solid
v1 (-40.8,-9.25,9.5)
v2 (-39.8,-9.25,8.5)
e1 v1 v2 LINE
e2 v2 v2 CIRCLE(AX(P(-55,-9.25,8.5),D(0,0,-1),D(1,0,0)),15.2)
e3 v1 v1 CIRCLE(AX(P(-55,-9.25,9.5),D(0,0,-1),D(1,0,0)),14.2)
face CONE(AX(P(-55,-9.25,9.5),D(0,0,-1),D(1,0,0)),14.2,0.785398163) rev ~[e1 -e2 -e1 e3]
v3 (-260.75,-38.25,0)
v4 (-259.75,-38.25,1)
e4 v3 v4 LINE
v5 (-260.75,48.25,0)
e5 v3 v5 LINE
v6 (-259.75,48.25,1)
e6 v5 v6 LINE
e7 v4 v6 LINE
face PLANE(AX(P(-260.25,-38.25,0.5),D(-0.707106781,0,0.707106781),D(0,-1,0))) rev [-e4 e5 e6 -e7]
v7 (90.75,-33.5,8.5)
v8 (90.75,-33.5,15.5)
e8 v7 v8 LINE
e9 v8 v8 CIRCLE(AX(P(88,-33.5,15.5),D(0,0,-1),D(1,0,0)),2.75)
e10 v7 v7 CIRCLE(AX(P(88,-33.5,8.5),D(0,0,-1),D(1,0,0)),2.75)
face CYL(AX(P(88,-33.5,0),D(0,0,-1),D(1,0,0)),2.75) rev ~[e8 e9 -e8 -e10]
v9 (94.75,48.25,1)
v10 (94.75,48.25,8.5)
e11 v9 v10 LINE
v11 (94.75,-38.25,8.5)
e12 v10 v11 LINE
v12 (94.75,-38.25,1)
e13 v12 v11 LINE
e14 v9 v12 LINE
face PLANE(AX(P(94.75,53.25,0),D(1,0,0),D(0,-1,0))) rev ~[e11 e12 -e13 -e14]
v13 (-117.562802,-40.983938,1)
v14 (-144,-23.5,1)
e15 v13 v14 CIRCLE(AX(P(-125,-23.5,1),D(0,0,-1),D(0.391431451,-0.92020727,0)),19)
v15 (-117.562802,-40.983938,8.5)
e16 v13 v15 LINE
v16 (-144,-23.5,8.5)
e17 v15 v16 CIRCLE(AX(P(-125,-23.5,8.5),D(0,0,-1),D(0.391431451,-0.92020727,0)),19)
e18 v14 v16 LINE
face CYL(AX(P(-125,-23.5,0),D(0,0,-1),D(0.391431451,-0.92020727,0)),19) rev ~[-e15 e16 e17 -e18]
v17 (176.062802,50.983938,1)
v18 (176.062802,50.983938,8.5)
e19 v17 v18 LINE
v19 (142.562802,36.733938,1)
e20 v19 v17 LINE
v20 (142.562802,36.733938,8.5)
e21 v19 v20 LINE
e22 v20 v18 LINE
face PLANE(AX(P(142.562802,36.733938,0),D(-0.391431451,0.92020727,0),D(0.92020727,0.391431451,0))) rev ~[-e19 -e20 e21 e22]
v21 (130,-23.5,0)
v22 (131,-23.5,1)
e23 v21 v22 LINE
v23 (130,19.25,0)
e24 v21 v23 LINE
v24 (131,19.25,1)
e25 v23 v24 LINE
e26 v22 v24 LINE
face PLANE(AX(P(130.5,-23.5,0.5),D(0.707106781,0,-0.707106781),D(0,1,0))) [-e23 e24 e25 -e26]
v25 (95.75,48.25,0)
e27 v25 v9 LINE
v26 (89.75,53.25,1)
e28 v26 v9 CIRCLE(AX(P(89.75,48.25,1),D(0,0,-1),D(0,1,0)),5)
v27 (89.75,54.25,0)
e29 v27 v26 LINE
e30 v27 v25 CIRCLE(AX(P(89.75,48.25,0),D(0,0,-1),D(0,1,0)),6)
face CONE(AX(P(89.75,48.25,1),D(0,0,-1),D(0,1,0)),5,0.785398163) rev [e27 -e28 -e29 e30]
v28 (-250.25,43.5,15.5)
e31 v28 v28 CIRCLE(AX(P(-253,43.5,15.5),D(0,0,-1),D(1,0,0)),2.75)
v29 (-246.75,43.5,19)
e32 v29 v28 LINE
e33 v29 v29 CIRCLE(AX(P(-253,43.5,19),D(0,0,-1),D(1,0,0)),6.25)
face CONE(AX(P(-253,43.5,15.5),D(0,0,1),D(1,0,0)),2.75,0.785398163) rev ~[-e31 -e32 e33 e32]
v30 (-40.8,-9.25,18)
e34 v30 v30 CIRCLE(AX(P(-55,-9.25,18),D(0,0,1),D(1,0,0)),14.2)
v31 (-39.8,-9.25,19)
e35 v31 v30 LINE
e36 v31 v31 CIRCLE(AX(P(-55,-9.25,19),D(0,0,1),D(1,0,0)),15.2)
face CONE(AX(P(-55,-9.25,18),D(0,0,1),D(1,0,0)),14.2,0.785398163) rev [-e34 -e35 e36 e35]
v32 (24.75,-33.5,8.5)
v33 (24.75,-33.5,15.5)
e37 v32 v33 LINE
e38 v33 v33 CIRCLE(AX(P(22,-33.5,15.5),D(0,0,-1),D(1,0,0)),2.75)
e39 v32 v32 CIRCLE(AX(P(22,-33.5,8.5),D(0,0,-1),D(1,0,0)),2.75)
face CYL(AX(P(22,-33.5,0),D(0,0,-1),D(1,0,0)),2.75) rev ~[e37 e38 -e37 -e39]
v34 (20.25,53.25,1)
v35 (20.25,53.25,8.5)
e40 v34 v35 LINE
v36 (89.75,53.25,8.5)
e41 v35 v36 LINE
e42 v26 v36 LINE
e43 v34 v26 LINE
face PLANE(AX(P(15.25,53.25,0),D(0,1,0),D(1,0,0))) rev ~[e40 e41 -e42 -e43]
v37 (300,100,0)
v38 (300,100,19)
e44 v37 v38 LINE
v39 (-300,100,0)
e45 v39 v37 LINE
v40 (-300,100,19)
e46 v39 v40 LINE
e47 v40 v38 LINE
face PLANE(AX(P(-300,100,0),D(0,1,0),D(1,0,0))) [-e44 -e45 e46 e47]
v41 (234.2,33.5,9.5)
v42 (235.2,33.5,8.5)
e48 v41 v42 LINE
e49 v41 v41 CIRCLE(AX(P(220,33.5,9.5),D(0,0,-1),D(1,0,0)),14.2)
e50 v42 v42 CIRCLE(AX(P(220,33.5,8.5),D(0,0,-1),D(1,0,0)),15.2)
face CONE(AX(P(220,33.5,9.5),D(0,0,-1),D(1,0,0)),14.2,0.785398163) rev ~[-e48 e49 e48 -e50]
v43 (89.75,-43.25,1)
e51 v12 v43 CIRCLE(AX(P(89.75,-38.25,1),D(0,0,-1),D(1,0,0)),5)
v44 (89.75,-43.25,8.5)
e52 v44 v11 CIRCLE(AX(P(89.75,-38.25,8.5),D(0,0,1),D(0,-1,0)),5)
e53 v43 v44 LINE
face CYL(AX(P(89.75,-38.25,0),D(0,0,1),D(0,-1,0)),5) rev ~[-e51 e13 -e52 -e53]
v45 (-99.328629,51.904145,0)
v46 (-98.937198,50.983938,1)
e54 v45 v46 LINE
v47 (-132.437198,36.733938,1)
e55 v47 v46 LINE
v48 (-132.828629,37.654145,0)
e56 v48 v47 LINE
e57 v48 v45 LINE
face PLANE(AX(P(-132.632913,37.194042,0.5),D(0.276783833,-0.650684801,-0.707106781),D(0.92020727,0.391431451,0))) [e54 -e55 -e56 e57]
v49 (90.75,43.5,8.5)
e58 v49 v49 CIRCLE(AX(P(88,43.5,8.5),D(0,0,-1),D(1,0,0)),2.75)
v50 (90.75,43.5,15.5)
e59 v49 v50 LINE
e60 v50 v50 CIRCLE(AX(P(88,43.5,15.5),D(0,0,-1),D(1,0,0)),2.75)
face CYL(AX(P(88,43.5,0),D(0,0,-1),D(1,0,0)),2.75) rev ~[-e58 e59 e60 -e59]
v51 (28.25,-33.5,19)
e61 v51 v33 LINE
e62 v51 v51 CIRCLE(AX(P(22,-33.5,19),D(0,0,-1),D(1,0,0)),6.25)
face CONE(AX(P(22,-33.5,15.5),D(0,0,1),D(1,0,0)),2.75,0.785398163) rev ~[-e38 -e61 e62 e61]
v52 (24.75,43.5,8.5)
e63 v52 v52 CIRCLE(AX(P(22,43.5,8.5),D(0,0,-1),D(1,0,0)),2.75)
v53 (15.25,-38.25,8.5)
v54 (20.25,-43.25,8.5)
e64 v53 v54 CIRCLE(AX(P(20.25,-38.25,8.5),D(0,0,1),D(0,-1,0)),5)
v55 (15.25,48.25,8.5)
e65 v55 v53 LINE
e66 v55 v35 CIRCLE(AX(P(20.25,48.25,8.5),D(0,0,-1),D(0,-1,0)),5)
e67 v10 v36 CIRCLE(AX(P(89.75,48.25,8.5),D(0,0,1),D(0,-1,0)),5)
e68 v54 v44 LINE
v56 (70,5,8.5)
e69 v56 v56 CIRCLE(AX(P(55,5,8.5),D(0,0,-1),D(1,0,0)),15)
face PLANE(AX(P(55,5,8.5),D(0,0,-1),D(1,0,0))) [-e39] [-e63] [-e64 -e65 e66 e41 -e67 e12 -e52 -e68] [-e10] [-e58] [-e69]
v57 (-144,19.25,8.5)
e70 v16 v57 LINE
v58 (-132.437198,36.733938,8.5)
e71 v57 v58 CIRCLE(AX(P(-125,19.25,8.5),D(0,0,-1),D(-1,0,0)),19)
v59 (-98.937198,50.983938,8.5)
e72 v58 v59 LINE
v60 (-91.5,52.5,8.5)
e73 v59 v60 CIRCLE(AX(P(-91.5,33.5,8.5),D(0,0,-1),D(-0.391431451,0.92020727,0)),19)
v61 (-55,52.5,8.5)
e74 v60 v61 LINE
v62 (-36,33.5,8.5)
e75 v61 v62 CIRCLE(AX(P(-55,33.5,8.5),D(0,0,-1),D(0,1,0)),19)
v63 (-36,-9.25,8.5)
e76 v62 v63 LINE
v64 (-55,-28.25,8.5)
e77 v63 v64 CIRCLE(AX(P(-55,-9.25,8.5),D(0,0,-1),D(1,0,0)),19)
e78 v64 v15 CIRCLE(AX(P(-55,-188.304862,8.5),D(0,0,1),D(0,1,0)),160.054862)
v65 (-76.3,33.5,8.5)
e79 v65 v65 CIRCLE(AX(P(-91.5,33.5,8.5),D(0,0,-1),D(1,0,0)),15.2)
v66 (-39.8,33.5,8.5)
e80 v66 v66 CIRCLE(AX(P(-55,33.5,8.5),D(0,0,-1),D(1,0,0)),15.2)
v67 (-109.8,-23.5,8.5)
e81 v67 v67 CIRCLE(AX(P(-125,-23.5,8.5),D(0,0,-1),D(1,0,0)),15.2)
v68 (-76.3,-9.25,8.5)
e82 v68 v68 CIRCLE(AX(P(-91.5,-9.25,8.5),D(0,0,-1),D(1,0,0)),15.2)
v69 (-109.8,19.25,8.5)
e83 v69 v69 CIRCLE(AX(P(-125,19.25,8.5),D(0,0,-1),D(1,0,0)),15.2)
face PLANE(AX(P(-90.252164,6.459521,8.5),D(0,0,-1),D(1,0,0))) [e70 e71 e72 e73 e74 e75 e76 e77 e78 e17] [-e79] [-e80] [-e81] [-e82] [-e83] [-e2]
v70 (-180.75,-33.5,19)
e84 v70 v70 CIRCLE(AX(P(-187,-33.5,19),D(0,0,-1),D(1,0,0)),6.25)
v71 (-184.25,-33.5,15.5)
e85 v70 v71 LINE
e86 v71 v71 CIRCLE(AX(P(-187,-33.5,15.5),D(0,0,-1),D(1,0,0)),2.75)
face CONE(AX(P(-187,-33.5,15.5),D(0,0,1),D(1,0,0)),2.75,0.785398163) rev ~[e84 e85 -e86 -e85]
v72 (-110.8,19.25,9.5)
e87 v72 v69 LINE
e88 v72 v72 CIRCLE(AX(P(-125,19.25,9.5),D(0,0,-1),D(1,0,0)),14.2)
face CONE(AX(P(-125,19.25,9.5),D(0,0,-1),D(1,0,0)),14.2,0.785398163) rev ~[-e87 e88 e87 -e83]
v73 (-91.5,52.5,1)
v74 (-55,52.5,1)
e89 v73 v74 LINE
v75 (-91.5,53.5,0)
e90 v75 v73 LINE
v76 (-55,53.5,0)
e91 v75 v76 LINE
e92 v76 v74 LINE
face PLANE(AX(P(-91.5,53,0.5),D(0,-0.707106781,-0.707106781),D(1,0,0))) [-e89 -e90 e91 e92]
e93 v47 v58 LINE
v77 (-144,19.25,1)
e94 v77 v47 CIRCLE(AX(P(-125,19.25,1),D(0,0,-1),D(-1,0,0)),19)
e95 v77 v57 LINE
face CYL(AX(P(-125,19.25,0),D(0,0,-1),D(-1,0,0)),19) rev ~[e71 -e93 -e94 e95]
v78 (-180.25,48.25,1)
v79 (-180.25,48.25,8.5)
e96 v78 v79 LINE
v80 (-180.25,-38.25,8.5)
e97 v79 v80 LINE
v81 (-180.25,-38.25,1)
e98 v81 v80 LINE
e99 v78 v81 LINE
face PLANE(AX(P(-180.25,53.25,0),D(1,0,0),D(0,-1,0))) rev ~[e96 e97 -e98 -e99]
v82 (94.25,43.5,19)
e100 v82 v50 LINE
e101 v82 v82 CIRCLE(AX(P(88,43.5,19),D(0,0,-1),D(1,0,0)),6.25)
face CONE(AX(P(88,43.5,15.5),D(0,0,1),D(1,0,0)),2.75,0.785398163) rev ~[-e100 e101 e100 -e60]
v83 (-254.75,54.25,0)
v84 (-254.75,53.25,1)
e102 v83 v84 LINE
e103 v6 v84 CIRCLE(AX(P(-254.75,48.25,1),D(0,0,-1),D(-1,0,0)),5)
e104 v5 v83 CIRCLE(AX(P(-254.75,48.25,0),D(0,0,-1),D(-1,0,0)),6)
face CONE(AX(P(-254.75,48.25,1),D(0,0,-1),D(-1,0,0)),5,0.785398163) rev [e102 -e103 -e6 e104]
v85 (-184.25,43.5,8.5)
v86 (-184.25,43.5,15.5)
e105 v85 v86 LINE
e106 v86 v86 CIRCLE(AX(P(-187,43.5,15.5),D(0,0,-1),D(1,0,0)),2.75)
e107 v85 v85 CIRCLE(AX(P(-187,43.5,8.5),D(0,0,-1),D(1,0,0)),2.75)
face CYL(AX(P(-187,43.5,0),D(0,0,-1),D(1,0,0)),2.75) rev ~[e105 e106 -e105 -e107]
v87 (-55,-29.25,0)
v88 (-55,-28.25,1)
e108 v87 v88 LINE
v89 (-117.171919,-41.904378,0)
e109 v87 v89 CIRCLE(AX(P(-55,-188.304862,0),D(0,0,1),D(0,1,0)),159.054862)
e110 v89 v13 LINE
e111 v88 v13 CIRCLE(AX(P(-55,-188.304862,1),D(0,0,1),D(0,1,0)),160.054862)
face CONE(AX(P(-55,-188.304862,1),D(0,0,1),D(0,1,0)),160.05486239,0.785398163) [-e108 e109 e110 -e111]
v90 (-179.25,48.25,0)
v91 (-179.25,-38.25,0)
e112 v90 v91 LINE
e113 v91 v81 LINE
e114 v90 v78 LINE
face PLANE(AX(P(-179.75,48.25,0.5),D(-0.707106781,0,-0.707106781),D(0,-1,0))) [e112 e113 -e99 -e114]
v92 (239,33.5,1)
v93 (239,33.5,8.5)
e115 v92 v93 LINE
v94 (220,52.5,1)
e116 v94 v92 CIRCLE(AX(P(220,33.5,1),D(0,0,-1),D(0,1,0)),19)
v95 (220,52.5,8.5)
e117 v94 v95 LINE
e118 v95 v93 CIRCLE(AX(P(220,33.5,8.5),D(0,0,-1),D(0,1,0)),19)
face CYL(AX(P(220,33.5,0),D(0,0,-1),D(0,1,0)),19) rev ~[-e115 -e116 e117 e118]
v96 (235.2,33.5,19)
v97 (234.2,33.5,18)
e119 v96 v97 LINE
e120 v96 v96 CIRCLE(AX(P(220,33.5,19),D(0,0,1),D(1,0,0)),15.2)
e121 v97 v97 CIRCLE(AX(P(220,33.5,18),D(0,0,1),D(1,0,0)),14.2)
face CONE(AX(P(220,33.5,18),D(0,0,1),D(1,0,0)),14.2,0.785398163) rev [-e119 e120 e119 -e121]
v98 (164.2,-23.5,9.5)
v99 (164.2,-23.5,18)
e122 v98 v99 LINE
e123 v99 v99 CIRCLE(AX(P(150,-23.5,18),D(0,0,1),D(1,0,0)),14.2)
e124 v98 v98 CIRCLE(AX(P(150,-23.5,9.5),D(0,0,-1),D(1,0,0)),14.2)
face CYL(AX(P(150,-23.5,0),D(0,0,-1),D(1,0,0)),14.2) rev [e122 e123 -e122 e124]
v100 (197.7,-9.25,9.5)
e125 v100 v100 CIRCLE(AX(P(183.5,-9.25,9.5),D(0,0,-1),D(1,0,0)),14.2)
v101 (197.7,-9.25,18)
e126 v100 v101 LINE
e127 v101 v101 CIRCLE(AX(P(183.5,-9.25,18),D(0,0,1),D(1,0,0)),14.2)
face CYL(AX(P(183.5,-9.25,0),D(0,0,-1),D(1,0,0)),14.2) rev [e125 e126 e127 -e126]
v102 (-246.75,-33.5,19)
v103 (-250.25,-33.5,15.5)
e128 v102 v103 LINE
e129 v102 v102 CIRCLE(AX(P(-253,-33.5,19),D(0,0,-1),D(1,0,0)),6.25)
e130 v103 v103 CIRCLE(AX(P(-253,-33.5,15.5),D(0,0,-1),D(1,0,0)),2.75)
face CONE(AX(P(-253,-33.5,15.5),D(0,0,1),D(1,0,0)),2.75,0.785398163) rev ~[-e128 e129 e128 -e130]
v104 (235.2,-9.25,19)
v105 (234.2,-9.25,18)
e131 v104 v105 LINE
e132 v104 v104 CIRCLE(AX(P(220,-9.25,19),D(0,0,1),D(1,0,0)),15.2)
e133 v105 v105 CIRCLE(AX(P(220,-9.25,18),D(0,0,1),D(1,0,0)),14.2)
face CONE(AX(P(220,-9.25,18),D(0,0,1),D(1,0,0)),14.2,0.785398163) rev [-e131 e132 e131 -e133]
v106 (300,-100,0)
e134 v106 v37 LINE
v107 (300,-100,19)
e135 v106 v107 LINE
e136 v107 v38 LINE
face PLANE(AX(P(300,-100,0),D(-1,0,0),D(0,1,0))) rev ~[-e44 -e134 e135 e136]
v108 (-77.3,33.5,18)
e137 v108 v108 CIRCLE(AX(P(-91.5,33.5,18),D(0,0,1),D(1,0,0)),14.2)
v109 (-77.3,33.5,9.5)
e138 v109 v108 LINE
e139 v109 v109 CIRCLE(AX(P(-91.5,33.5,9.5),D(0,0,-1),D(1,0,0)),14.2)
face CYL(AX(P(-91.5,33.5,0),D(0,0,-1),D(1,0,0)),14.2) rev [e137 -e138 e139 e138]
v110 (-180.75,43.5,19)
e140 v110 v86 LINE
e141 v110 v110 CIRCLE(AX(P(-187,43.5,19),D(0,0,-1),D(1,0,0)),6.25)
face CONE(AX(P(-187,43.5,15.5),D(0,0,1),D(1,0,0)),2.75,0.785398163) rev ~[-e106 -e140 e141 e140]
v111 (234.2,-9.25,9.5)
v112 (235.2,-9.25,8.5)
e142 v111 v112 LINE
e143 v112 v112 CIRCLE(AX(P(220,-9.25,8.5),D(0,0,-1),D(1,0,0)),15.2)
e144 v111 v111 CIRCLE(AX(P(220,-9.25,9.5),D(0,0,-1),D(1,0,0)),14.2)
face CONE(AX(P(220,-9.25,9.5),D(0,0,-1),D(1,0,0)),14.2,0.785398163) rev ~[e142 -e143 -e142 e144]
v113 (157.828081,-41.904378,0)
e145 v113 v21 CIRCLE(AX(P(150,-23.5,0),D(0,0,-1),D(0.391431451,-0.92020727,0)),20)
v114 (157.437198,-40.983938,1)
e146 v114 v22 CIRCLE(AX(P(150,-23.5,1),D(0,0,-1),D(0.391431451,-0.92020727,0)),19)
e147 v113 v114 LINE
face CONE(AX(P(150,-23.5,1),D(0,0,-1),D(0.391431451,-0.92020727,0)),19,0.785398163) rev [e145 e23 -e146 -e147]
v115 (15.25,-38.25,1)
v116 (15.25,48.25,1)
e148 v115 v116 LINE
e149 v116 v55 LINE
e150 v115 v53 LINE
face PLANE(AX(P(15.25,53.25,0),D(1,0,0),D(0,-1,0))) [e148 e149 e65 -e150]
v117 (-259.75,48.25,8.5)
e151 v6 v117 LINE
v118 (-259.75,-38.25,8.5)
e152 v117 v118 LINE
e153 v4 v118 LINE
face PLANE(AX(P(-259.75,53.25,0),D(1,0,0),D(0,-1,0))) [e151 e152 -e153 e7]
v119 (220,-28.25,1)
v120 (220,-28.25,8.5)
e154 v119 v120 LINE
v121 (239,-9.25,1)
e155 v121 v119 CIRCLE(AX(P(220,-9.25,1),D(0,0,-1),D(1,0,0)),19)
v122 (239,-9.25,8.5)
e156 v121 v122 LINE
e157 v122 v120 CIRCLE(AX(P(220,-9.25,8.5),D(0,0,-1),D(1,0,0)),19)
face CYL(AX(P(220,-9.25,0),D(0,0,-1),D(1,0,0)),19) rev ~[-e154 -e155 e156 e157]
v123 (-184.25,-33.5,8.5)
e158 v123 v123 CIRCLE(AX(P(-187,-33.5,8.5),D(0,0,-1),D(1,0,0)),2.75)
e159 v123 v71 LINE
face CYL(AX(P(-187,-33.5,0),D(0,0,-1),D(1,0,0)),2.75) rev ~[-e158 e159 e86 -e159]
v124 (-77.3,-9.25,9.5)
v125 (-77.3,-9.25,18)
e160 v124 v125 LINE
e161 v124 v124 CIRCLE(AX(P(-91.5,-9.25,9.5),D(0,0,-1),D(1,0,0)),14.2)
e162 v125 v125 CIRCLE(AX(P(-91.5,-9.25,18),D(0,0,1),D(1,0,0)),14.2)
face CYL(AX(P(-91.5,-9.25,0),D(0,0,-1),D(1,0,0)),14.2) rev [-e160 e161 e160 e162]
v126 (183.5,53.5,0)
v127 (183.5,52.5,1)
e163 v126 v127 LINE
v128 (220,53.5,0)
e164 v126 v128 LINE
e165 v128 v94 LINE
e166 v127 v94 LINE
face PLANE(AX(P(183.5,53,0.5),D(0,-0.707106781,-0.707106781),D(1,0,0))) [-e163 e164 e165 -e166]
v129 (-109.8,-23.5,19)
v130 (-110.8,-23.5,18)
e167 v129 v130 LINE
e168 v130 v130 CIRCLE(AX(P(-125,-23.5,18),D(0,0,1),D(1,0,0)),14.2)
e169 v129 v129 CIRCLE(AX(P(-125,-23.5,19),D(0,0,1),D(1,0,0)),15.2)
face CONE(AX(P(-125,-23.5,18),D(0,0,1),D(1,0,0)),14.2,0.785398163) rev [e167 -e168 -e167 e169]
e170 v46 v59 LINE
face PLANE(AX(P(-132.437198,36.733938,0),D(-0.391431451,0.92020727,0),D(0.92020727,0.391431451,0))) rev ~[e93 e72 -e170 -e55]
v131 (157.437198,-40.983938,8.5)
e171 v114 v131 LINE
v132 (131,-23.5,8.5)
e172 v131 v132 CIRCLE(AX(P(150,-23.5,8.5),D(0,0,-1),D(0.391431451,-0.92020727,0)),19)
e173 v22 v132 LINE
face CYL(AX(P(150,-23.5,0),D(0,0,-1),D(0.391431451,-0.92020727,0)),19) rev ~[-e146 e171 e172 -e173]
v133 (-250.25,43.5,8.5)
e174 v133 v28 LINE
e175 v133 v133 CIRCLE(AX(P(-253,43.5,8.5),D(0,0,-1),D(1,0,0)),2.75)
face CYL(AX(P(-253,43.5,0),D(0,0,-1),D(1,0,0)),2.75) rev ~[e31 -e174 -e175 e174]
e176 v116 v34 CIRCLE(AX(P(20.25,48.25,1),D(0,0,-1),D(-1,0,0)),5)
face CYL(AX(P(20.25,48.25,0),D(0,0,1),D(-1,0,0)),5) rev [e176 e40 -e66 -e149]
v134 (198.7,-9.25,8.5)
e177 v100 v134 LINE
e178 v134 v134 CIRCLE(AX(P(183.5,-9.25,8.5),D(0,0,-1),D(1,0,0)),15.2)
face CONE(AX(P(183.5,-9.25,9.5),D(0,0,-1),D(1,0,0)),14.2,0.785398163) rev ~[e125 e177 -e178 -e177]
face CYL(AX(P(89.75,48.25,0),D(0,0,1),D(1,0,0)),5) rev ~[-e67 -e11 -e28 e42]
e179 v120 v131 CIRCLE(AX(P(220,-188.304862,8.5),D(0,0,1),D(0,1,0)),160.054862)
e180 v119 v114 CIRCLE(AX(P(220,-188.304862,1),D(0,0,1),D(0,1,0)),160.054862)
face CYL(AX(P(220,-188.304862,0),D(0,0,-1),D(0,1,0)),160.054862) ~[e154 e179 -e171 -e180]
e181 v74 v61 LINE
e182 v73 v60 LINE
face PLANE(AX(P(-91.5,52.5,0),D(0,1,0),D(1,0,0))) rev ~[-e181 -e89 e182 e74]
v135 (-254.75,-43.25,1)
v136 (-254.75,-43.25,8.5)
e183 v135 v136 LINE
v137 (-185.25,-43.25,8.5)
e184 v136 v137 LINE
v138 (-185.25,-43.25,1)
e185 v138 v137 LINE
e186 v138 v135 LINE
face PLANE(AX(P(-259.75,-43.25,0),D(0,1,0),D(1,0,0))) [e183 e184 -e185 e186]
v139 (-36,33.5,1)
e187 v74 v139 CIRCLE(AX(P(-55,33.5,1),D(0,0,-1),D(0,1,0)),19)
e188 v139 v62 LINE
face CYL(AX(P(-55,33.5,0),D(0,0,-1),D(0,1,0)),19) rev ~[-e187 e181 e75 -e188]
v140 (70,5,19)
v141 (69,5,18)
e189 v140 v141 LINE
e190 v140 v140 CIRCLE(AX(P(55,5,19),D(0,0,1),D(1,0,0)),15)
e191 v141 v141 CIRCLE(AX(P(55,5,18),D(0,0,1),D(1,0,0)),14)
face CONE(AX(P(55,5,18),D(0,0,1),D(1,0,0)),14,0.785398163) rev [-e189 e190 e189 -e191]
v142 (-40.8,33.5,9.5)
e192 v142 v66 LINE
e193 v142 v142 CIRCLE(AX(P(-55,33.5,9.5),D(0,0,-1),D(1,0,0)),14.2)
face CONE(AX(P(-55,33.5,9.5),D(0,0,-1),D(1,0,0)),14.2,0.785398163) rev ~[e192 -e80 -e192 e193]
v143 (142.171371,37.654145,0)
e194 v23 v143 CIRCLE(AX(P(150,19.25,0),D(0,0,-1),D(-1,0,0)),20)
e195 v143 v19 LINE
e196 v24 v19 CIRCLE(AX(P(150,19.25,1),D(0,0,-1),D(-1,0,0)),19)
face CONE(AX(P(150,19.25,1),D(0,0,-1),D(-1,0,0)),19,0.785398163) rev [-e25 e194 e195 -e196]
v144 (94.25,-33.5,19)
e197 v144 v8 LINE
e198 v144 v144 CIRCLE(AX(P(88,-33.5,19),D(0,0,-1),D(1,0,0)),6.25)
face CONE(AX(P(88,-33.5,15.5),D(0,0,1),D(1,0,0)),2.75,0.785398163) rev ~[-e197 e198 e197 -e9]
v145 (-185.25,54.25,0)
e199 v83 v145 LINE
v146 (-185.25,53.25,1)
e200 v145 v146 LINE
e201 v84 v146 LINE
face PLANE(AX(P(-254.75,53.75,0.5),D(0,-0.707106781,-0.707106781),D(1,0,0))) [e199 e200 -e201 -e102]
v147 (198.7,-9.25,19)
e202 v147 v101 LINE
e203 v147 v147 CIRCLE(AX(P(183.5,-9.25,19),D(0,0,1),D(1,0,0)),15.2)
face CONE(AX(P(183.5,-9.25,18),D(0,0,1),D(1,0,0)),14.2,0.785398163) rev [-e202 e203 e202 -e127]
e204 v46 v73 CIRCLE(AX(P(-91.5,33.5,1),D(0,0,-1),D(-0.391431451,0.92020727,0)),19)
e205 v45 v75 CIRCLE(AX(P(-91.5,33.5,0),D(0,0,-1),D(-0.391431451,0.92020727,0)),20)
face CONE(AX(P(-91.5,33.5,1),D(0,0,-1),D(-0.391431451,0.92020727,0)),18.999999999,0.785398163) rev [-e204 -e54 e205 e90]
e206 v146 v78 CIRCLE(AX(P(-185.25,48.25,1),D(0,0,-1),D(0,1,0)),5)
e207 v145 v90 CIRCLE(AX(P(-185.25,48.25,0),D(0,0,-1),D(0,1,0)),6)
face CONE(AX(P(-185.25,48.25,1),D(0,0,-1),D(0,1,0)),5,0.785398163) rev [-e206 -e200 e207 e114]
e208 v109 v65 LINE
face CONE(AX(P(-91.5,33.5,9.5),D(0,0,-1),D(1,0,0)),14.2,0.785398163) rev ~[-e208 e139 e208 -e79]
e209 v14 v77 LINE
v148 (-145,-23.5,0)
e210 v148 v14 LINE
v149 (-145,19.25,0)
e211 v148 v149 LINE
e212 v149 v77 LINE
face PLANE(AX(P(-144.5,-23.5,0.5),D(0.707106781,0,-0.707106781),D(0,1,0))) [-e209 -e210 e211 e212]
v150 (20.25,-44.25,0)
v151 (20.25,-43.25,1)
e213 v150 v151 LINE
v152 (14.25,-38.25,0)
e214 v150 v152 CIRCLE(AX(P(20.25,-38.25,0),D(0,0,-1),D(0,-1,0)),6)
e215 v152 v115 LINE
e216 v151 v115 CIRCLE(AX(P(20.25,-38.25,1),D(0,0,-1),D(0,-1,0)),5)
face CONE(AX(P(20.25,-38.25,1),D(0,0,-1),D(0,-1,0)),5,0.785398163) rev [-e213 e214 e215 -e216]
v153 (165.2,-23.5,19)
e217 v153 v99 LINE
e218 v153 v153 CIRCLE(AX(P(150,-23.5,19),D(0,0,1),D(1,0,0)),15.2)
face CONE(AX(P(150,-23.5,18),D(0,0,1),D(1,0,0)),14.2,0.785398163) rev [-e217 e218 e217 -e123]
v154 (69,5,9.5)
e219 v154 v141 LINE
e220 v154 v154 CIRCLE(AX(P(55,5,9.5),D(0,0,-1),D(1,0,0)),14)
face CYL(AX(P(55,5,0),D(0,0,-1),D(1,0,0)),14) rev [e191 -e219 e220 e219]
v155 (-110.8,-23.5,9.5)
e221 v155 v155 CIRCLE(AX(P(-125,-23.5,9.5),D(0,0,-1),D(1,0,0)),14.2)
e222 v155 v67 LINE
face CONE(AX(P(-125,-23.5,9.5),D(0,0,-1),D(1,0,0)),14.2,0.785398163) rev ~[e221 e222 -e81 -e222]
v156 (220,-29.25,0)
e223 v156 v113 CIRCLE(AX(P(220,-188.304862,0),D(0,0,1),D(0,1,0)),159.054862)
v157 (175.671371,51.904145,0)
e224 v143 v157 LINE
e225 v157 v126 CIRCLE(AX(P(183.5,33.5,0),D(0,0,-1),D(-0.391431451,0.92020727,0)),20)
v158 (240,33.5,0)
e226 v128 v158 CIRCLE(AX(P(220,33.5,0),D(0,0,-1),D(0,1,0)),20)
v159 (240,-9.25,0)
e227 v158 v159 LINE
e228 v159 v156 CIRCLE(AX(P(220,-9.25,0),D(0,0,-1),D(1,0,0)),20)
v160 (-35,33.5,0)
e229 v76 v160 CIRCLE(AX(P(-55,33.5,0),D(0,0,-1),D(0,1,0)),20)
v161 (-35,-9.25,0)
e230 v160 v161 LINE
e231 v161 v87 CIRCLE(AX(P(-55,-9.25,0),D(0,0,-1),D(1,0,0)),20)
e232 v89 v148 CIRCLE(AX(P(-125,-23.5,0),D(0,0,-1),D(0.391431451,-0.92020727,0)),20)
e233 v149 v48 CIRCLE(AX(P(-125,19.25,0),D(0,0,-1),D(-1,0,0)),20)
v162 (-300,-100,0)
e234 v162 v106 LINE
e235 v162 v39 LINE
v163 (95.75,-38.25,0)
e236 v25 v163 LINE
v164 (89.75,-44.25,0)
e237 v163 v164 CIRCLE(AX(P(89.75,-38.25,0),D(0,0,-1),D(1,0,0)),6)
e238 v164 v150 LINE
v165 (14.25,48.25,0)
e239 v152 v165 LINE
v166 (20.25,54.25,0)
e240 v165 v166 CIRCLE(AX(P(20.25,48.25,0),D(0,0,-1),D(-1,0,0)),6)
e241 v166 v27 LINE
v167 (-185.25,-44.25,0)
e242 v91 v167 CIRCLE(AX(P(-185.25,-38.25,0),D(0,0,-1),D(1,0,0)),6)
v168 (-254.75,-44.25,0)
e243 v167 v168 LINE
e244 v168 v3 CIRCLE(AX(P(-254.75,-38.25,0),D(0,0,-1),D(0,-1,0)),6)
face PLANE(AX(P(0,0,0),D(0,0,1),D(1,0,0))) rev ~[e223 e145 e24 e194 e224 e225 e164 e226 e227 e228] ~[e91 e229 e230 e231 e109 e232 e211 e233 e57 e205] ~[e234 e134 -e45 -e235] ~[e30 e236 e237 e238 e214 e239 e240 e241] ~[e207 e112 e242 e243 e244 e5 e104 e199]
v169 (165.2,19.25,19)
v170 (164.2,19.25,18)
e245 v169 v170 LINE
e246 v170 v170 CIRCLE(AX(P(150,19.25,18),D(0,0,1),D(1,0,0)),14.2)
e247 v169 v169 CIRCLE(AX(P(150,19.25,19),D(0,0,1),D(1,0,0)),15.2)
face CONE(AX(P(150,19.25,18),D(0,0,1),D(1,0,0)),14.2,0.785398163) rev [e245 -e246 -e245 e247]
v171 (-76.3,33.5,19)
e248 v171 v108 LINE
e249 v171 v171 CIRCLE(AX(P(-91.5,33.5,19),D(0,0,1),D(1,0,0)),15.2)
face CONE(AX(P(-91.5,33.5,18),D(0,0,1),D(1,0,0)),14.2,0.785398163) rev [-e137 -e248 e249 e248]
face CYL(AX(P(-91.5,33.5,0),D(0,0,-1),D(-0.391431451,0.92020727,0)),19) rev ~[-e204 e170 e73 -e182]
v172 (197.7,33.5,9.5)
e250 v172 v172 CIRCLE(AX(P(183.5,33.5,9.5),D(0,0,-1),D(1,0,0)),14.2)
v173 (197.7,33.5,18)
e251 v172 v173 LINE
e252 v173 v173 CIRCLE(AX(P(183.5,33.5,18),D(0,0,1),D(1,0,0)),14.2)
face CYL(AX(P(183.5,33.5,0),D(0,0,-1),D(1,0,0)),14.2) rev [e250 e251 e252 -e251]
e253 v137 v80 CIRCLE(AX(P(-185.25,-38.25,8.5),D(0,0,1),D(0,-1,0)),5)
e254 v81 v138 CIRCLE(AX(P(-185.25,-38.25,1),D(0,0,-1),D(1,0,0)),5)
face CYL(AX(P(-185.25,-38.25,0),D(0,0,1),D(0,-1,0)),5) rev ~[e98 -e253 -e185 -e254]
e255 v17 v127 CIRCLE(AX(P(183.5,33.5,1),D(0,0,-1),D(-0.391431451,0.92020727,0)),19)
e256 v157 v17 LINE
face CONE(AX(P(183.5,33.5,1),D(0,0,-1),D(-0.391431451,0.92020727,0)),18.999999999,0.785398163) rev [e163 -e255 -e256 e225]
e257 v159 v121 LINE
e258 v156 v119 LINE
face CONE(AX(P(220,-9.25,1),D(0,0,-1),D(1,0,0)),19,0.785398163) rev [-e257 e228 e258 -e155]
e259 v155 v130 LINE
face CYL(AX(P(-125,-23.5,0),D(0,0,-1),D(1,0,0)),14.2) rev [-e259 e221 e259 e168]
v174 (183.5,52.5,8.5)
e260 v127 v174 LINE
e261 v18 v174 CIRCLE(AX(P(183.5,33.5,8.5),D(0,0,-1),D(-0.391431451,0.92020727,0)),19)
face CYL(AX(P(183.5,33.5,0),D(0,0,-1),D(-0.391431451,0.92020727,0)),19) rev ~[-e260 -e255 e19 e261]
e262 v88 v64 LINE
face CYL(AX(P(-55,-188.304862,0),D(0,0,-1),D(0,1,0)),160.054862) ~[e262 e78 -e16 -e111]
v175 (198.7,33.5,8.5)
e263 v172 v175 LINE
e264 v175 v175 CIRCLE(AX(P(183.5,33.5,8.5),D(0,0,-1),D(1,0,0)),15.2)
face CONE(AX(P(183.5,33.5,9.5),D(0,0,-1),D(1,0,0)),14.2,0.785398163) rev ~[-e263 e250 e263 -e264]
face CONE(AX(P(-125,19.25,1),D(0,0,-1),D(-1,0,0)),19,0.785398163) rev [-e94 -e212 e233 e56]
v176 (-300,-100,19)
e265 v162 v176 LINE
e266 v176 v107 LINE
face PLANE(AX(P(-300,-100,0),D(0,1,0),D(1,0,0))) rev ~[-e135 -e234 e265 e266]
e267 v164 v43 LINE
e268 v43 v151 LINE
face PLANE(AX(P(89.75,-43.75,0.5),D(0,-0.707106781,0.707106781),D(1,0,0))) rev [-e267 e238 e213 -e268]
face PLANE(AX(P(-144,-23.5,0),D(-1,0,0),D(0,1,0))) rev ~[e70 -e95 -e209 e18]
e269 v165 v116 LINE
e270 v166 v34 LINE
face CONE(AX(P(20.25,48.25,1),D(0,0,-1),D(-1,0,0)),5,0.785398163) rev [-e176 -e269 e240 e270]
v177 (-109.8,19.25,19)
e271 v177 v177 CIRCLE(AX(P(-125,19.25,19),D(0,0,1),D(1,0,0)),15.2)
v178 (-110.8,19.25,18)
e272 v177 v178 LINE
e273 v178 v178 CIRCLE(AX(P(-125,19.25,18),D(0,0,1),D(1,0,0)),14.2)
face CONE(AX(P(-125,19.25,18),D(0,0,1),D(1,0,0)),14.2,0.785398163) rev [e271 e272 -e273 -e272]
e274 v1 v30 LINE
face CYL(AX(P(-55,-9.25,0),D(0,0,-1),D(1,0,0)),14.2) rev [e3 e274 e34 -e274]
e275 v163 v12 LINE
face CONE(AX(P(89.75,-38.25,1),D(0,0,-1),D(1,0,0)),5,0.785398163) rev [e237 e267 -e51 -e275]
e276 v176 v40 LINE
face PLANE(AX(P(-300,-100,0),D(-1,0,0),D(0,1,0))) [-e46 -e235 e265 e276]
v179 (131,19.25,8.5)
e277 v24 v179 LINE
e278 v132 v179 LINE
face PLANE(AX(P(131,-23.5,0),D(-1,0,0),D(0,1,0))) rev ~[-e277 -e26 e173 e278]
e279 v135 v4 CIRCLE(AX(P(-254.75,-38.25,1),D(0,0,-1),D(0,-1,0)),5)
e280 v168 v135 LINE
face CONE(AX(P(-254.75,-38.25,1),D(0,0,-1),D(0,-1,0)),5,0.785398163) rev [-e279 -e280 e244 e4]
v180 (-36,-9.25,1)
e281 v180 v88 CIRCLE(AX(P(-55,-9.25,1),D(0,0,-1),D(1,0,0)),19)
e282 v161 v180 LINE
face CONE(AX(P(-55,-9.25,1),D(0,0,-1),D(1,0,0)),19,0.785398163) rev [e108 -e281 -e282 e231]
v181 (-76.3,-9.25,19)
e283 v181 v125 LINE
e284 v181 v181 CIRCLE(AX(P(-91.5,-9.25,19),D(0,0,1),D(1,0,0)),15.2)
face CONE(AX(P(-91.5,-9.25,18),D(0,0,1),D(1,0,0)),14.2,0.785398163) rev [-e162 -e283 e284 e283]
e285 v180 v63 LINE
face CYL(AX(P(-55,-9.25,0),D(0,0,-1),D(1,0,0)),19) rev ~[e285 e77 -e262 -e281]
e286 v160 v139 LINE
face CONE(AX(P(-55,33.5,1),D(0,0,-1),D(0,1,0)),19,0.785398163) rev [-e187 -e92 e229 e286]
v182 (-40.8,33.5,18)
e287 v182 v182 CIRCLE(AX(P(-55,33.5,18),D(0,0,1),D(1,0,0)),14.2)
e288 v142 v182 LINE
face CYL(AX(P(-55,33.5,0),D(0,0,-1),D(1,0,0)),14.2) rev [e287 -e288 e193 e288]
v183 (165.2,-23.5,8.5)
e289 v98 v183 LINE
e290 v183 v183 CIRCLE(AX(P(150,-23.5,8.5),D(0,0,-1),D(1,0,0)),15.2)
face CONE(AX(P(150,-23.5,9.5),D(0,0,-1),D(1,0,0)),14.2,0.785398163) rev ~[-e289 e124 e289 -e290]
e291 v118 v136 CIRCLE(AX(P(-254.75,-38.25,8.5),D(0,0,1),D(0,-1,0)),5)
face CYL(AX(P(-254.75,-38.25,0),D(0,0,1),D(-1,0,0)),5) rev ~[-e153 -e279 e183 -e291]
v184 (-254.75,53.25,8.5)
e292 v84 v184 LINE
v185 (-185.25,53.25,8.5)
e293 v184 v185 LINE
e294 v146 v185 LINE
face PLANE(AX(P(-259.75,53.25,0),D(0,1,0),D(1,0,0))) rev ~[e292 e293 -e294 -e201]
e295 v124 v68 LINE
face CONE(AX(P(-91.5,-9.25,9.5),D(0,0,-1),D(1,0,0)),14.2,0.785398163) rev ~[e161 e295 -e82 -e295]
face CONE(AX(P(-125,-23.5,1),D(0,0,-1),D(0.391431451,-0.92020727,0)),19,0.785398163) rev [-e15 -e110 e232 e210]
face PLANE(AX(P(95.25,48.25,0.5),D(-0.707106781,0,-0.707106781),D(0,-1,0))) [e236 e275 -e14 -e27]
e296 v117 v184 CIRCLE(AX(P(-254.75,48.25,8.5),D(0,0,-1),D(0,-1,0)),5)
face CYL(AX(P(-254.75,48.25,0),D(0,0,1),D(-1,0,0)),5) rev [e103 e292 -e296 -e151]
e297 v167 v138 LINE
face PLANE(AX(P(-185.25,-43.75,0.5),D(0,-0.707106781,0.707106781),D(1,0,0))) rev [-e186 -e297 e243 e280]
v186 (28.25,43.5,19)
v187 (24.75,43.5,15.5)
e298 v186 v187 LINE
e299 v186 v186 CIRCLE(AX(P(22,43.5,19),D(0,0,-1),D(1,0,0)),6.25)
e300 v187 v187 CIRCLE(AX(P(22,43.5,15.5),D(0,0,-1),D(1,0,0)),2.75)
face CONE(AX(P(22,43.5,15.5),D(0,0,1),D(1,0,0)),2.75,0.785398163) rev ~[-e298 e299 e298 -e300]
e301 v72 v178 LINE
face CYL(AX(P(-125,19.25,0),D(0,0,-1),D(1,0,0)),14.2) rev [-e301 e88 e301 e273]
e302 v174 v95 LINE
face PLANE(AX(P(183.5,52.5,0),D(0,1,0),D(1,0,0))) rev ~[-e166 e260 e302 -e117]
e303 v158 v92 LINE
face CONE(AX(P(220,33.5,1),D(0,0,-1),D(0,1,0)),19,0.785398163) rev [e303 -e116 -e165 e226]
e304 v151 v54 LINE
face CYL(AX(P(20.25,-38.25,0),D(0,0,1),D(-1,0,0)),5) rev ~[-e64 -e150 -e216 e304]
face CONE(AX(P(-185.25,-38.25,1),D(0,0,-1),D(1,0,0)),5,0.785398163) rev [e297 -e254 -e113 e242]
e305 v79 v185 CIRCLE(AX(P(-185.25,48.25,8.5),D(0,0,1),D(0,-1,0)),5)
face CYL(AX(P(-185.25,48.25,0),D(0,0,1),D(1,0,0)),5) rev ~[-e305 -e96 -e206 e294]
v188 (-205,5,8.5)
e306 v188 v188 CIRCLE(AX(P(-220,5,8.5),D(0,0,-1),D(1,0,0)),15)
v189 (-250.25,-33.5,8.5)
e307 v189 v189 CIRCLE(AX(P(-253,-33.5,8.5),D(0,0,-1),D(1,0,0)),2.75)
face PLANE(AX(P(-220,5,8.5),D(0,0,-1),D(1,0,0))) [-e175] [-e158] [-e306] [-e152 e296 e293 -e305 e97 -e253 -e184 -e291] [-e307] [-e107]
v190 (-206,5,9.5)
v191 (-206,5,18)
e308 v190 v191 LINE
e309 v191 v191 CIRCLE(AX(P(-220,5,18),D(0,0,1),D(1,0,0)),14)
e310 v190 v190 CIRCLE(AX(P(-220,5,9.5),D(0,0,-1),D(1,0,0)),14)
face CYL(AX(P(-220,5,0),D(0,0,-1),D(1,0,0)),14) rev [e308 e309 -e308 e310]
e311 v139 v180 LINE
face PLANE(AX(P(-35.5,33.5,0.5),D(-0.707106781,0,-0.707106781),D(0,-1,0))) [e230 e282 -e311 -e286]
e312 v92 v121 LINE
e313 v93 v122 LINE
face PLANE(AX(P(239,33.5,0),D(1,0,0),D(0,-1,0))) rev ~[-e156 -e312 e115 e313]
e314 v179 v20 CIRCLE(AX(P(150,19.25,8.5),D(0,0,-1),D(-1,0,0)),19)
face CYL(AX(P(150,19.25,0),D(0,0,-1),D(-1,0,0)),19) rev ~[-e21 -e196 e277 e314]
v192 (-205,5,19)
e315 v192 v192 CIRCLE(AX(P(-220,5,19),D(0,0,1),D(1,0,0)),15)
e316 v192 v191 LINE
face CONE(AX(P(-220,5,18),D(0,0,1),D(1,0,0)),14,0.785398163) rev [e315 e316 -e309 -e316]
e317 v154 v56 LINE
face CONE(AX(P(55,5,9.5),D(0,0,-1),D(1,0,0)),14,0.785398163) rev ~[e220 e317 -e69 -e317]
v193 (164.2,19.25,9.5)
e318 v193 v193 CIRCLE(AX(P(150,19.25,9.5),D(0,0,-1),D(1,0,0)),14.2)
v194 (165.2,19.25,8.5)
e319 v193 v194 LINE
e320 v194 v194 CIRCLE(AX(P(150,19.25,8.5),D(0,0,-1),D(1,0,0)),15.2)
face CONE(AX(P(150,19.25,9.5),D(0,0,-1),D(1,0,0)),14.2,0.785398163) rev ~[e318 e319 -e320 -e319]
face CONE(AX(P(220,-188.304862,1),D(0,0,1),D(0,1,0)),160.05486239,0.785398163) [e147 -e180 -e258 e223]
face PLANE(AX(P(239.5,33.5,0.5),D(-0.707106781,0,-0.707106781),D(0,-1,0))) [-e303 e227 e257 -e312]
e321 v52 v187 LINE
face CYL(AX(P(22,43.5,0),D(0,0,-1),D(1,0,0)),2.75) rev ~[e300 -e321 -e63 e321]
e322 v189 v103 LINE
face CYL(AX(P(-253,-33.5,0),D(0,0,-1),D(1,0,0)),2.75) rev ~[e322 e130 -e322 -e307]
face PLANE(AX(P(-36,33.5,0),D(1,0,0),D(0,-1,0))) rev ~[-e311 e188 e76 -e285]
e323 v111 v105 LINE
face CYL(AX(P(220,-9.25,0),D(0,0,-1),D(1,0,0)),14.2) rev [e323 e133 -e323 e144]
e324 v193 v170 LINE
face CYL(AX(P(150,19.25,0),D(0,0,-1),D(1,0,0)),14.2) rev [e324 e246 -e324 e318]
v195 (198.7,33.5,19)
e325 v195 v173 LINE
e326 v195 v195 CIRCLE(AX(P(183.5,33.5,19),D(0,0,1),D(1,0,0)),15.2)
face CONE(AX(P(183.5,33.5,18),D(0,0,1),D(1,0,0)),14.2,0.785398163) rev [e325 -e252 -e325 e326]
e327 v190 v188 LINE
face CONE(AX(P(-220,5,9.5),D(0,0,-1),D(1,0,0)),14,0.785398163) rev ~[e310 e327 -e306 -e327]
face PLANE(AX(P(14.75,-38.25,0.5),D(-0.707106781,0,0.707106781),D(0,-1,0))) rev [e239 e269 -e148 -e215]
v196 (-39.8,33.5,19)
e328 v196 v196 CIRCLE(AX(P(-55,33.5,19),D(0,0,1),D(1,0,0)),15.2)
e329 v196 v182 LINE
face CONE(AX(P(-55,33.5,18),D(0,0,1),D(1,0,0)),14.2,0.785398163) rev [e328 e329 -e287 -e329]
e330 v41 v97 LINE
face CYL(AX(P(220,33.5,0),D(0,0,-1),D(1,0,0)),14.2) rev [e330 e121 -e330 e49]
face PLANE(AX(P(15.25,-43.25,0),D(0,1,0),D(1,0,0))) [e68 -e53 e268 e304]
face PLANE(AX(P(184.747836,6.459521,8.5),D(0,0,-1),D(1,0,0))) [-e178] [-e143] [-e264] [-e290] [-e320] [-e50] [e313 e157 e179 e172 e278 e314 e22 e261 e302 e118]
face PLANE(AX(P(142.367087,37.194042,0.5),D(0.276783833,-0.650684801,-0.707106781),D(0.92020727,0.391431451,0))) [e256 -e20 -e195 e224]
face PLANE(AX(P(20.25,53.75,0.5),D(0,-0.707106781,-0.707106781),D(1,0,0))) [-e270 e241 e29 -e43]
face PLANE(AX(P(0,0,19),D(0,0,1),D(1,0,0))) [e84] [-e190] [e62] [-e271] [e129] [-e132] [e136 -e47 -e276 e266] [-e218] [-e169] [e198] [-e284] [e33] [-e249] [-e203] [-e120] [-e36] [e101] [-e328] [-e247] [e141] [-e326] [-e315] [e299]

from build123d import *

# Parameters (mm, degrees)
F0_W     = 600
F0_H     = 200
F0_R     = 14.2
F0_R_2   = 14
F1_DEPTH = 19
F2_R     = 14.2
F2_W     = 79.5
F2_H     = 96.5
F2_R_2   = 2.75
F2_R_3   = 14
F3_DEPTH = 8.5
F4_DEPTH = 19.001
F5_R     = 5
F6_SIZE  = 3.5
F7_SIZE  = 1


# Not quite as in the source:
# - a feature names something its author has since deleted; it is built from what else it names


with BuildPart() as f1:
    # F0 (on Top) → F1 (new body)
    with BuildSketch(Plane.XY):
        Rectangle(F0_W, F0_H)
        with Locations((-125, -23.5)):
            Circle(F0_R, mode=Mode.SUBTRACT)
        with Locations((-91.5, -9.25)):
            Circle(F0_R, mode=Mode.SUBTRACT)
        with Locations((-55, -9.25)):
            Circle(F0_R, mode=Mode.SUBTRACT)
        with Locations((150, -23.5)):
            Circle(F0_R, mode=Mode.SUBTRACT)
        with Locations((183.5, -9.25)):
            Circle(F0_R, mode=Mode.SUBTRACT)
        with Locations((220, -9.25)):
            Circle(F0_R, mode=Mode.SUBTRACT)
        with Locations((-220, 5)):
            Circle(F0_R_2, mode=Mode.SUBTRACT)
        with Locations((-125, 19.25)):
            Circle(F0_R, mode=Mode.SUBTRACT)
        with Locations((-91.5, 33.5)):
            Circle(F0_R, mode=Mode.SUBTRACT)
        with Locations((-55, 33.5)):
            Circle(F0_R, mode=Mode.SUBTRACT)
        with Locations((55, 5)):
            Circle(F0_R_2, mode=Mode.SUBTRACT)
        with Locations((150, 19.25)):
            Circle(F0_R, mode=Mode.SUBTRACT)
        with Locations((183.5, 33.5)):
            Circle(F0_R, mode=Mode.SUBTRACT)
        with Locations((220, 33.5)):
            Circle(F0_R, mode=Mode.SUBTRACT)
    extrude(amount=F1_DEPTH)

    # F2 (on face) → F3 (cut)
    with BuildSketch(Plane(origin=(0, 0, 0), x_dir=(1, 0, 0), z_dir=(0, 0, -1))):
        with BuildLine():
            ThreePointArc((-98.9371975615, -50.9839381271), (-95.2950741485, -52.1171268516), (-91.5, -52.5))
            Line((-91.5, -52.5), (-55, -52.5))
            ThreePointArc((-55, -52.5), (-41.5649711575, -46.9350288425), (-36, -33.5))
            Line((-36, -33.5), (-36, 9.25))
            ThreePointArc((-36, 9.25), (-41.5649711575, 22.6850288425), (-55, 28.25))
            ThreePointArc((-55, 28.25), (-86.9227874299, 31.4657900344), (-117.5628024385, 40.9839381271))
            ThreePointArc((-117.5628024385, 40.9839381271), (-135.4807739774, 39.3478193085), (-144, 23.5))
            Line((-144, 23.5), (-144, -19.25))
            ThreePointArc((-144, -19.25), (-140.8478193085, -29.7307739774), (-132.4371975615, -36.7339381271))
            Line((-132.4371975615, -36.7339381271), (-98.9371975615, -50.9839381271))
        make_face()
        with Locations((-91.5, -33.5)):
            Circle(F2_R, mode=Mode.SUBTRACT)
        with Locations((-55, -33.5)):
            Circle(F2_R, mode=Mode.SUBTRACT)
        with Locations((-125, -19.25)):
            Circle(F2_R, mode=Mode.SUBTRACT)
        with Locations((-91.5, 9.25)):
            Circle(F2_R, mode=Mode.SUBTRACT)
        with Locations((-125, 23.5)):
            Circle(F2_R, mode=Mode.SUBTRACT)
        with Locations((-55, 9.25)):
            Circle(F2_R, mode=Mode.SUBTRACT)
        with BuildLine():
            ThreePointArc((131, -19.25), (134.1521806915, -29.7307739774), (142.5628024385, -36.7339381271))
            Line((142.5628024385, -36.7339381271), (176.0628024385, -50.9839381271))
            ThreePointArc((176.0628024385, -50.9839381271), (179.7049258515, -52.1171268516), (183.5, -52.5))
            Line((183.5, -52.5), (220, -52.5))
            ThreePointArc((220, -52.5), (233.4350288425, -46.9350288425), (239, -33.5))
            Line((239, -33.5), (239, 9.25))
            ThreePointArc((239, 9.25), (233.4350288425, 22.6850288425), (220, 28.25))
            ThreePointArc((220, 28.25), (188.0772125701, 31.4657900344), (157.4371975615, 40.9839381271))
            ThreePointArc((157.4371975615, 40.9839381271), (139.5192260226, 39.3478193085), (131, 23.5))
            Line((131, 23.5), (131, -19.25))
        make_face()
        with Locations((183.5, -33.5)):
            Circle(F2_R, mode=Mode.SUBTRACT)
        with Locations((220, -33.5)):
            Circle(F2_R, mode=Mode.SUBTRACT)
        with Locations((150, -19.25)):
            Circle(F2_R, mode=Mode.SUBTRACT)
        with Locations((183.5, 9.25)):
            Circle(F2_R, mode=Mode.SUBTRACT)
        with Locations((220, 9.25)):
            Circle(F2_R, mode=Mode.SUBTRACT)
        with Locations((150, 23.5)):
            Circle(F2_R, mode=Mode.SUBTRACT)
        with Locations((-220, -5)):
            Rectangle(F2_W, F2_H)
        with Locations((-253, -43.5)):
            Circle(F2_R_2, mode=Mode.SUBTRACT)
        with Locations((-187, -43.5)):
            Circle(F2_R_2, mode=Mode.SUBTRACT)
        with Locations((-220, -5)):
            Circle(F2_R_3, mode=Mode.SUBTRACT)
        with Locations((-253, 33.5)):
            Circle(F2_R_2, mode=Mode.SUBTRACT)
        with Locations((-187, 33.5)):
            Circle(F2_R_2, mode=Mode.SUBTRACT)
        with Locations((55, -5)):
            Rectangle(F2_W, F2_H)
        with Locations((22, -43.5)):
            Circle(F2_R_2, mode=Mode.SUBTRACT)
        with Locations((88, -43.5)):
            Circle(F2_R_2, mode=Mode.SUBTRACT)
        with Locations((55, -5)):
            Circle(F2_R_3, mode=Mode.SUBTRACT)
        with Locations((22, 33.5)):
            Circle(F2_R_2, mode=Mode.SUBTRACT)
        with Locations((88, 33.5)):
            Circle(F2_R_2, mode=Mode.SUBTRACT)
        with Locations((-253, 33.5)):
            Circle(F2_R_2)
        with Locations((-187, 33.5)):
            Circle(F2_R_2)
        with Locations((-187, -43.5)):
            Circle(F2_R_2)
        with Locations((-253, -43.5)):
            Circle(F2_R_2)
        with Locations((22, 33.5)):
            Circle(F2_R_2)
        with Locations((88, 33.5)):
            Circle(F2_R_2)
        with Locations((88, -43.5)):
            Circle(F2_R_2)
        with Locations((22, -43.5)):
            Circle(F2_R_2)
    extrude(amount=-F3_DEPTH, mode=Mode.SUBTRACT)

    # F2 (on face) → F4 (cut, through all)
    with BuildSketch(Plane(origin=(0, 0, 0), x_dir=(1, 0, 0), z_dir=(0, 0, -1))):
        with Locations((-253, 33.5)):
            Circle(F2_R_2)
        with Locations((-187, 33.5)):
            Circle(F2_R_2)
        with Locations((-187, -43.5)):
            Circle(F2_R_2)
        with Locations((-253, -43.5)):
            Circle(F2_R_2)
        with Locations((22, 33.5)):
            Circle(F2_R_2)
        with Locations((88, 33.5)):
            Circle(F2_R_2)
        with Locations((88, -43.5)):
            Circle(F2_R_2)
        with Locations((22, -43.5)):
            Circle(F2_R_2)
    extrude(amount=-F4_DEPTH, mode=Mode.SUBTRACT)

    # F5
    f5_edges = [f1.edges().sort_by_distance(p)[0] for p in [
        (-259.75, -43.25, 4.25),
        (-180.25, -43.25, 4.25),
        (-180.25, 53.25, 4.25),
        (-259.75, 53.25, 4.25),
        (15.25, 53.25, 4.25),
        (15.25, -43.25, 4.25),
        (94.75, -43.25, 4.25),
        (94.75, 53.25, 4.25),
    ]]
    fillet(f5_edges, radius=F5_R)

    # F6
    f6_edges = [f1.edges().sort_by_distance(p)[0] for p in [
        (85.25, -33.5, 19),
        (85.25, 43.5, 19),
        (19.25, 43.5, 19),
        (19.25, -33.5, 19),
        (-189.75, 43.5, 19),
        (-189.75, -33.5, 19),
        (-255.75, -33.5, 19),
        (-255.75, 43.5, 19),
    ]]
    chamfer(f6_edges, length=F6_SIZE)

    # F7
    f7_edges = [f1.edges().sort_by_distance(p)[0] for p in [
        (-234, 5, 8.5),
        (-206, 5, 13.75),
        (-234, 5, 19),
        (-139.2, 19.25, 8.5),
        (-110.8, 19.25, 13.75),
        (-139.2, 19.25, 19),
        (-105.7, 33.5, 8.5),
        (-77.3, 33.5, 13.75),
        (-105.7, 33.5, 19),
        (-139.2, -23.5, 8.5),
        (-110.8, -23.5, 13.75),
        (-139.2, -23.5, 19),
        (-105.7, -9.25, 8.5),
        (-77.3, -9.25, 13.75),
        (-105.7, -9.25, 19),
        (-69.2, -9.25, 8.5),
        (-40.8, -9.25, 13.75),
        (-69.2, -9.25, 19),
        (-69.2, 33.5, 8.5),
        (-40.8, 33.5, 13.75),
        (-69.2, 33.5, 19),
        (41, 5, 8.5),
        (69, 5, 13.75),
        (41, 5, 19),
        (135.8, 19.25, 8.5),
        (164.2, 19.25, 13.75),
        (135.8, 19.25, 19),
        (135.8, -23.5, 8.5),
        (164.2, -23.5, 13.75),
        (135.8, -23.5, 19),
        (169.3, -9.25, 8.5),
        (197.7, -9.25, 13.75),
        (169.3, -9.25, 19),
        (169.3, 33.5, 8.5),
        (197.7, 33.5, 13.75),
        (169.3, 33.5, 19),
        (205.8, 33.5, 8.5),
        (234.2, 33.5, 13.75),
        (205.8, 33.5, 19),
        (205.8, -9.25, 8.5),
        (234.2, -9.25, 13.75),
        (205.8, -9.25, 19),
        (55, 53.25, 0),
        (-220, 53.25, 0),
        (-86.922787, -31.46579, 0),
        (188.077213, -31.46579, 0),
    ]]
    chamfer(f7_edges, length=F7_SIZE)


solid = f1.part
